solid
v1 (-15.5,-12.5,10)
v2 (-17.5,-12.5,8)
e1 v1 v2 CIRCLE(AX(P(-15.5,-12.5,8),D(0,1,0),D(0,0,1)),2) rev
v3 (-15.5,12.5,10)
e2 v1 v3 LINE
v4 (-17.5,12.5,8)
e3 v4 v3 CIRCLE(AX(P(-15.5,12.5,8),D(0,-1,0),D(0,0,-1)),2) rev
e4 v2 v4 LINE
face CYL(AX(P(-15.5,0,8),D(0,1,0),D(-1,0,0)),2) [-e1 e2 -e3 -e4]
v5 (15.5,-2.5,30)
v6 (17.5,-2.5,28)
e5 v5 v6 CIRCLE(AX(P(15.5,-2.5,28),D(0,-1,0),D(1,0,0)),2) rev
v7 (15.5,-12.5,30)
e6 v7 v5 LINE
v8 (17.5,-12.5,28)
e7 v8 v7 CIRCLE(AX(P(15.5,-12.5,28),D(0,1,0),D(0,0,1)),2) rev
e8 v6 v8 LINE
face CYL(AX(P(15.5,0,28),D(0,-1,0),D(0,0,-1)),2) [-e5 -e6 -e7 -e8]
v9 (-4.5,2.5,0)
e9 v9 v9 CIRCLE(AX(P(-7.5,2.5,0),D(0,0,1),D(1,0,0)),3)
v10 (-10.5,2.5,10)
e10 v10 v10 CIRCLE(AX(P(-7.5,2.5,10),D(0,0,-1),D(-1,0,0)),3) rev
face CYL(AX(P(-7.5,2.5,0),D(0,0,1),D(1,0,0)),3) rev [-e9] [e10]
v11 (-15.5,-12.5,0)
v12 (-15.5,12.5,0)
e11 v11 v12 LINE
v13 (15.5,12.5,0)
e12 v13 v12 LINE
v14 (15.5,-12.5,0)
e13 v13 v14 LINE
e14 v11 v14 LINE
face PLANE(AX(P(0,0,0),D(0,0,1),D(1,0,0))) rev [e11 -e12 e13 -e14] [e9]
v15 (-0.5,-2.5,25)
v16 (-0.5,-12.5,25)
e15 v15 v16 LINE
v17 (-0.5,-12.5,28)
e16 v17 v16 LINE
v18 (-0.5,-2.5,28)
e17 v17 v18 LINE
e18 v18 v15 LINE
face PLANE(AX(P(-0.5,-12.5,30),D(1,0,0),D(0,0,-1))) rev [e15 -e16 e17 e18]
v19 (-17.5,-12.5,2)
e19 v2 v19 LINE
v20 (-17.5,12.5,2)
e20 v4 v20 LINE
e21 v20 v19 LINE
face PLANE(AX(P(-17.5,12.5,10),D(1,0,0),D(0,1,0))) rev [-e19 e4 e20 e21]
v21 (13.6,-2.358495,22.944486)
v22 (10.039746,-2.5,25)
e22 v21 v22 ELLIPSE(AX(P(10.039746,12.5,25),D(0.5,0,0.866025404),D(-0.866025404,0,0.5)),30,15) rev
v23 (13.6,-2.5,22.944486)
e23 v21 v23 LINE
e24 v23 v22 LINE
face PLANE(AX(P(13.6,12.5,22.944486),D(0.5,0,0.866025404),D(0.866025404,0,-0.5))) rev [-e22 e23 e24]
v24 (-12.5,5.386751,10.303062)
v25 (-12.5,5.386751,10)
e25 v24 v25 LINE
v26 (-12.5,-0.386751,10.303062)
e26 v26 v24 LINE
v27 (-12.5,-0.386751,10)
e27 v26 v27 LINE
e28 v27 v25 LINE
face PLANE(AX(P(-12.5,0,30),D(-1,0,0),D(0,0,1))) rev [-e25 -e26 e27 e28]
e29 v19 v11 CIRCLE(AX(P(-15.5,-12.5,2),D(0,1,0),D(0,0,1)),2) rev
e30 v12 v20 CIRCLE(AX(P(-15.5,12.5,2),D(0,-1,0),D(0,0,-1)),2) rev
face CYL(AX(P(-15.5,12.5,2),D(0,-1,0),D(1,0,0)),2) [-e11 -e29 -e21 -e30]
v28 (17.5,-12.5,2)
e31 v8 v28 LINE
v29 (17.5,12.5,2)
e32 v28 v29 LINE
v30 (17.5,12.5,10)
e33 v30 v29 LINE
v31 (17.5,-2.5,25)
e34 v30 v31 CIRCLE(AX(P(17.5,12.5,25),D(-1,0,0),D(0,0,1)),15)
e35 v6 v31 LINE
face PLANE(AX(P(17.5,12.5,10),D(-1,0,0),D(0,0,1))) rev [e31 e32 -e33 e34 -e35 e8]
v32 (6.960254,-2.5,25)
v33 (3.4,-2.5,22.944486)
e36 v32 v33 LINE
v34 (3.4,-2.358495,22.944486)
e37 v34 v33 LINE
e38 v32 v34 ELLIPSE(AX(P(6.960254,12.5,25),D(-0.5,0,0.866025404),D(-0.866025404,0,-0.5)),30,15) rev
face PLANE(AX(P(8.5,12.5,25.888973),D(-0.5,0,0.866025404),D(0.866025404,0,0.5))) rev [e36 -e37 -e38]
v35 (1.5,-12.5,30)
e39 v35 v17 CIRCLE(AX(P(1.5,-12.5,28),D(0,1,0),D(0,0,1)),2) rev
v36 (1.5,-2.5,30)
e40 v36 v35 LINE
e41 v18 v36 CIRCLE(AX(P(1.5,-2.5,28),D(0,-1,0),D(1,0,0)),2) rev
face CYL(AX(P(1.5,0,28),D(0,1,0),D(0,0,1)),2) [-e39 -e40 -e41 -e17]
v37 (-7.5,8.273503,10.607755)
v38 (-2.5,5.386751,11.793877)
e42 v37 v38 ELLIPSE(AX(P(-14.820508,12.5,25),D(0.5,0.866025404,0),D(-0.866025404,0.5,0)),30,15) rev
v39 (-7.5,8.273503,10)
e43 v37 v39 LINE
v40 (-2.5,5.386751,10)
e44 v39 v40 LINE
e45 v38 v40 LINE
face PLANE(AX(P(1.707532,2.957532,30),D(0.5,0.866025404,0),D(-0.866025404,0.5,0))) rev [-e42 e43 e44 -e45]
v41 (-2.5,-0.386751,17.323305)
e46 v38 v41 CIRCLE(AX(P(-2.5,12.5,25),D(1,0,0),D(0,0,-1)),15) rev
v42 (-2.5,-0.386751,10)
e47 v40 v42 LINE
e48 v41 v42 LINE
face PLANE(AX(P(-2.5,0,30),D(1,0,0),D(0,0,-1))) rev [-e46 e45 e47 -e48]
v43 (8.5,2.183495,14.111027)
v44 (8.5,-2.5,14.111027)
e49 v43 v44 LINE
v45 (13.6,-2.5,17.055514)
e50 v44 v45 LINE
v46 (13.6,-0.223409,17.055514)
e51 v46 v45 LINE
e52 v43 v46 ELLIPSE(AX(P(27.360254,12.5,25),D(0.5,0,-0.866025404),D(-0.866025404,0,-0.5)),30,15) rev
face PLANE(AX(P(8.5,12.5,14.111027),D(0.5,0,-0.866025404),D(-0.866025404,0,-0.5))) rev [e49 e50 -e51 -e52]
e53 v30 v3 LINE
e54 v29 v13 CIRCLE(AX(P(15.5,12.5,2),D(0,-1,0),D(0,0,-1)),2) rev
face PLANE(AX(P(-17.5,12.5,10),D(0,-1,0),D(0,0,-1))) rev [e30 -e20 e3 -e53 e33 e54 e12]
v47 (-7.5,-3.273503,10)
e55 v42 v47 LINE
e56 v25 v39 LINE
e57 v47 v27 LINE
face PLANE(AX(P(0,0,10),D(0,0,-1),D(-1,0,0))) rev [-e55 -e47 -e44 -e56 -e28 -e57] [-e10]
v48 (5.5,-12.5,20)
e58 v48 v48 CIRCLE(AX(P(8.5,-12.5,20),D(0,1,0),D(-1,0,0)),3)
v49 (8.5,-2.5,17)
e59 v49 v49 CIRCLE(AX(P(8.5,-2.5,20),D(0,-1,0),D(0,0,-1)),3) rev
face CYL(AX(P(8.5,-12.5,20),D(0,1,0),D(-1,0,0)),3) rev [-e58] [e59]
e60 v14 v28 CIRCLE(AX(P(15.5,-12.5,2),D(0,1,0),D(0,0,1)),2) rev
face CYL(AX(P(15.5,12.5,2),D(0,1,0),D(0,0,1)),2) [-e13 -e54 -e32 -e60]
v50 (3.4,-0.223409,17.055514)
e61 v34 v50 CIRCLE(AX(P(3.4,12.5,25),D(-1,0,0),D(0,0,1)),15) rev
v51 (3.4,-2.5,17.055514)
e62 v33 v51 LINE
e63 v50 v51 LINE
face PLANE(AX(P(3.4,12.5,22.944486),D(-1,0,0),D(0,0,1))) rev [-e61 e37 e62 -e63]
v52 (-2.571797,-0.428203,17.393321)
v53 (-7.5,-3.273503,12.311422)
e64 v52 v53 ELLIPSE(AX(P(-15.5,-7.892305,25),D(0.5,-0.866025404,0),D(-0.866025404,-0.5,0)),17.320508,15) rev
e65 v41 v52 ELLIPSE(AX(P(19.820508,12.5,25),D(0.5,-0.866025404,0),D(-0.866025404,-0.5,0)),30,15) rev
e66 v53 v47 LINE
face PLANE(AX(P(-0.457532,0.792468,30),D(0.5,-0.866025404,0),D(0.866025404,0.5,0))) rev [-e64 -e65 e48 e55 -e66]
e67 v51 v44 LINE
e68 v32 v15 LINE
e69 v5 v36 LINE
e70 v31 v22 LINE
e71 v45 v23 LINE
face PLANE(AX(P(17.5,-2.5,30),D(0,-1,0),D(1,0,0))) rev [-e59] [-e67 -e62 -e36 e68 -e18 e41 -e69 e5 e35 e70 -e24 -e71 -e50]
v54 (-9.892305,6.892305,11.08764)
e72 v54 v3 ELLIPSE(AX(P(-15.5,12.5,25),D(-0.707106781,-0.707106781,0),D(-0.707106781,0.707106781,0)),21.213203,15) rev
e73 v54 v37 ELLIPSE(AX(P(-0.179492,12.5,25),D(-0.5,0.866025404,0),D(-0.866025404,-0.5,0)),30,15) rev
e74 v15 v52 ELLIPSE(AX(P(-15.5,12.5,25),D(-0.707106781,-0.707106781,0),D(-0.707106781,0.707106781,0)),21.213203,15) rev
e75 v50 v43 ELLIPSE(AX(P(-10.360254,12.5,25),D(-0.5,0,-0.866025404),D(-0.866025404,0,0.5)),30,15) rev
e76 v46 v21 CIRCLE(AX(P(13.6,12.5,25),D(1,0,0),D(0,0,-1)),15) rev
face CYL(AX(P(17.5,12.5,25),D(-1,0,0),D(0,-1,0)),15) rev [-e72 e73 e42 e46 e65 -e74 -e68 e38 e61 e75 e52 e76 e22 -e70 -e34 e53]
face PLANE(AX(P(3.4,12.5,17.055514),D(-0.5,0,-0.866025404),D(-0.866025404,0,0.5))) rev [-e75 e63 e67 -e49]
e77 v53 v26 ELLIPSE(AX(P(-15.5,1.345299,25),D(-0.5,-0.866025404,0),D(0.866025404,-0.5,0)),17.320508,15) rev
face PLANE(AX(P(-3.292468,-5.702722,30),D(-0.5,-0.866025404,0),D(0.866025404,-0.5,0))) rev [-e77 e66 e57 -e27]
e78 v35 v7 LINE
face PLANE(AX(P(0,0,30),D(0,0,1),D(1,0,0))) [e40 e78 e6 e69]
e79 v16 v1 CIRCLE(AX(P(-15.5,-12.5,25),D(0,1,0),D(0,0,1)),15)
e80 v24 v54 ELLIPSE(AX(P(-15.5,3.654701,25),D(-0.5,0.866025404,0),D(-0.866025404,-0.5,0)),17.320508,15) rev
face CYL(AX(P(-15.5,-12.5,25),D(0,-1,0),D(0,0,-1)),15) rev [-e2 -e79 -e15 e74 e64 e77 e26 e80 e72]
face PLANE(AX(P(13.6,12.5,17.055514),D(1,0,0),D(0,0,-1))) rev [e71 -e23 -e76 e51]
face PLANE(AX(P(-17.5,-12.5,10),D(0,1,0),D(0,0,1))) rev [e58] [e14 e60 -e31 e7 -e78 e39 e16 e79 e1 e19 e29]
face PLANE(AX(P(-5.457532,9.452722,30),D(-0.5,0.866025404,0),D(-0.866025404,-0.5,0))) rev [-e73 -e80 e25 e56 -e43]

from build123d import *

# Parameters (mm, degrees)
SKETCH1_W           = 35
SKETCH1_H           = 25
BOSS_EXTRUDE1_DEPTH = 10
SKETCH2_R           = 3
CUT_EXTRUDE1_DEPTH  = 24.717082451
SKETCH3_W           = 18
SKETCH3_H           = 10
BOSS_EXTRUDE2_DEPTH = 20
SKETCH4_R           = 3
CUT_EXTRUDE2_DEPTH  = 38.831864876
FILLET2_R           = 15
FILLET3_R           = 2
CUT_EXTRUDE3_START  = -10
SKETCH5_R           = 3
CUT_EXTRUDE3_DEPTH  = 27.912057737
CUT_EXTRUDE4_START  = -10
CUT_EXTRUDE4_DEPTH  = 33.793107029


# Some blends are built 0.0001 mm under size
with BuildPart() as part:
    # Sketch1 → Boss-Extrude1 (new body)
    with BuildSketch(Plane.XY):
        Rectangle(SKETCH1_W, SKETCH1_H)
    extrude(amount=BOSS_EXTRUDE1_DEPTH)

    # Sketch2 → Cut-Extrude1 (cut, through all)
    with BuildSketch(Plane.XY.offset(10)):
        with Locations((-7.5, 2.5)):
            Circle(SKETCH2_R)
    extrude(amount=-CUT_EXTRUDE1_DEPTH, mode=Mode.SUBTRACT)

    # Sketch3 → Boss-Extrude2 (add)
    with BuildSketch(Plane.XY.offset(10)):
        with Locations((8.5, -7.5)):
            Rectangle(SKETCH3_W, SKETCH3_H)
    extrude(amount=BOSS_EXTRUDE2_DEPTH)

    # Sketch4 → Cut-Extrude2 (cut, through all)
    with BuildSketch(Plane(origin=(0, -2.5, 0), x_dir=(1, 0, 0), z_dir=(0, 1, 0))):
        with Locations(Location((8.5, -20, 0), (0, 0, 180))):
            Circle(SKETCH4_R)
    extrude(amount=-CUT_EXTRUDE2_DEPTH, mode=Mode.SUBTRACT)

    # Fillet2
    # the kernel refuses this fillet: 15 mm, written as the material it adds along each edge
    with BuildSketch(Plane(origin=(-0.5, -12.5, 10), x_dir=(-1, 0, 0), z_dir=(0, 1, 0))) as fillet2_piece_1:
        with BuildLine():
            CenterArc((FILLET2_R, FILLET2_R), FILLET2_R, 180, 90)
            Line((0, FILLET2_R), (0, 0))
            Line((0, 0), (FILLET2_R, 0))
        make_face()
    extrude(amount=10)
    with BuildSketch(Plane(origin=(-0.5, -2.5, 10), x_dir=(0, 1, 0), z_dir=(1, 0, 0))) as fillet2_piece_2_section:
        with BuildLine():
            CenterArc((FILLET2_R, FILLET2_R), FILLET2_R, 180, 90)
            Line((0, FILLET2_R), (0, 0))
            Line((0, 0), (FILLET2_R, 0))
        make_face()
    fillet2_piece_2 = extrude(amount=18, mode=Mode.PRIVATE)
    fillet2_piece_2 = fillet2_piece_2 - Plane(origin=(8.5, 1.000391612, 20), x_dir=(-1, 0, 0), z_dir=(0, 1, 0)) * Cylinder(3, 96, mode=Mode.PRIVATE)
    add(fillet2_piece_2)
    with BuildSketch(Plane(origin=(-0.5, -12.5, 10), x_dir=(-1, 0, 0), z_dir=(0, 1, 0))) as fillet2_piece_3a_section:
        with BuildLine():
            CenterArc((FILLET2_R, FILLET2_R), FILLET2_R, 180, 90)
            Line((0, FILLET2_R), (0, 0))
            Line((0, 0), (FILLET2_R, 0))
        make_face()
    fillet2_piece_3a = extrude(amount=47.5, mode=Mode.PRIVATE)
    fillet2_piece_3a = split(fillet2_piece_3a, bisect_by=Plane(origin=(-3.591955578, 12.5, 13.608814387), z_dir=(0, -1, 0)), keep=Keep.TOP, mode=Mode.PRIVATE)
    fillet2_piece_3a = fillet2_piece_3a - Plane(origin=(-7.5, 2.5, 13.608814387), x_dir=(1, 0, 0), z_dir=(0, 0, 1)) * Cylinder(3, 155, mode=Mode.PRIVATE)
    fillet2_piece_3a = split(fillet2_piece_3a, bisect_by=Plane(origin=(-3.591955578, -2.5, 13.608814387), z_dir=(0, 1, 0)), keep=Keep.TOP, mode=Mode.PRIVATE)
    with BuildSketch(Plane(origin=(-38, -2.5, 10), x_dir=(0, 1, 0), z_dir=(1, 0, 0))) as fillet2_piece_3b_section:
        with BuildLine():
            CenterArc((FILLET2_R, FILLET2_R), FILLET2_R, 180, 90)
            Line((0, FILLET2_R), (0, 0))
            Line((0, 0), (FILLET2_R, 0))
        make_face()
    fillet2_piece_3b = extrude(amount=55.5, mode=Mode.PRIVATE)
    fillet2_piece_3b = split(fillet2_piece_3b, bisect_by=Plane(origin=(-17.5, 8.593163462, 10.419487544), z_dir=(1, 0, 0)), keep=Keep.TOP, mode=Mode.PRIVATE)
    fillet2_piece_3b = fillet2_piece_3b - Plane(origin=(-7.5, 2.5, 10.419487544), x_dir=(1, 0, 0), z_dir=(0, 0, 1)) * Cylinder(3, 171, mode=Mode.PRIVATE)
    fillet2_piece_3b = split(fillet2_piece_3b, bisect_by=Plane(origin=(-0.5, 8.593163462, 10.419487544), z_dir=(-1, 0, 0)), keep=Keep.TOP, mode=Mode.PRIVATE)
    fillet2_piece_3 = fillet2_piece_3a & fillet2_piece_3b
    add(fillet2_piece_3)

    # Fillet3
    fillet3_edges = [part.edges().sort_by_distance(p)[0] for p in [
        (17.5, 0, 0),
        (-17.5, 0, 0),
        (-17.5, 0, 10),
        (-0.5, -7.5, 30),
        (17.5, -7.5, 30),
    ]]
    fillet(fillet3_edges, radius=FILLET3_R - 0.0001)  # a hair under: the kernel refuses the full size

    # Sketch5 → Cut-Extrude3 (cut, through all)
    with BuildSketch(Plane(origin=(0, 0, 0), x_dir=(-1, 0, 0), z_dir=(0, 0, -1)).offset(CUT_EXTRUDE3_START)):
        Polygon((2.5, 5.386751346), (2.5, -0.386751346), (7.5, -3.273502692), (12.5, -0.386751346), (12.5, 5.386751346), (7.5, 8.273502692), align=None)
        with Locations(Location((7.5, 2.5, 0), (0, 0, 180))):
            Circle(SKETCH5_R, mode=Mode.SUBTRACT)
    extrude(amount=-CUT_EXTRUDE3_DEPTH, mode=Mode.SUBTRACT)

    # Sketch6 → Cut-Extrude4 (cut, through all)
    with BuildSketch(Plane.XZ.offset(12.5).offset(CUT_EXTRUDE4_START)):
        Polygon((8.5, 14.111027254), (13.6, 17.055513627), (13.6, 22.944486373), (8.5, 25.888972746), (3.4, 22.944486373), (3.4, 17.055513627), align=None)
    extrude(amount=-CUT_EXTRUDE4_DEPTH, mode=Mode.SUBTRACT)


solid = part.part
